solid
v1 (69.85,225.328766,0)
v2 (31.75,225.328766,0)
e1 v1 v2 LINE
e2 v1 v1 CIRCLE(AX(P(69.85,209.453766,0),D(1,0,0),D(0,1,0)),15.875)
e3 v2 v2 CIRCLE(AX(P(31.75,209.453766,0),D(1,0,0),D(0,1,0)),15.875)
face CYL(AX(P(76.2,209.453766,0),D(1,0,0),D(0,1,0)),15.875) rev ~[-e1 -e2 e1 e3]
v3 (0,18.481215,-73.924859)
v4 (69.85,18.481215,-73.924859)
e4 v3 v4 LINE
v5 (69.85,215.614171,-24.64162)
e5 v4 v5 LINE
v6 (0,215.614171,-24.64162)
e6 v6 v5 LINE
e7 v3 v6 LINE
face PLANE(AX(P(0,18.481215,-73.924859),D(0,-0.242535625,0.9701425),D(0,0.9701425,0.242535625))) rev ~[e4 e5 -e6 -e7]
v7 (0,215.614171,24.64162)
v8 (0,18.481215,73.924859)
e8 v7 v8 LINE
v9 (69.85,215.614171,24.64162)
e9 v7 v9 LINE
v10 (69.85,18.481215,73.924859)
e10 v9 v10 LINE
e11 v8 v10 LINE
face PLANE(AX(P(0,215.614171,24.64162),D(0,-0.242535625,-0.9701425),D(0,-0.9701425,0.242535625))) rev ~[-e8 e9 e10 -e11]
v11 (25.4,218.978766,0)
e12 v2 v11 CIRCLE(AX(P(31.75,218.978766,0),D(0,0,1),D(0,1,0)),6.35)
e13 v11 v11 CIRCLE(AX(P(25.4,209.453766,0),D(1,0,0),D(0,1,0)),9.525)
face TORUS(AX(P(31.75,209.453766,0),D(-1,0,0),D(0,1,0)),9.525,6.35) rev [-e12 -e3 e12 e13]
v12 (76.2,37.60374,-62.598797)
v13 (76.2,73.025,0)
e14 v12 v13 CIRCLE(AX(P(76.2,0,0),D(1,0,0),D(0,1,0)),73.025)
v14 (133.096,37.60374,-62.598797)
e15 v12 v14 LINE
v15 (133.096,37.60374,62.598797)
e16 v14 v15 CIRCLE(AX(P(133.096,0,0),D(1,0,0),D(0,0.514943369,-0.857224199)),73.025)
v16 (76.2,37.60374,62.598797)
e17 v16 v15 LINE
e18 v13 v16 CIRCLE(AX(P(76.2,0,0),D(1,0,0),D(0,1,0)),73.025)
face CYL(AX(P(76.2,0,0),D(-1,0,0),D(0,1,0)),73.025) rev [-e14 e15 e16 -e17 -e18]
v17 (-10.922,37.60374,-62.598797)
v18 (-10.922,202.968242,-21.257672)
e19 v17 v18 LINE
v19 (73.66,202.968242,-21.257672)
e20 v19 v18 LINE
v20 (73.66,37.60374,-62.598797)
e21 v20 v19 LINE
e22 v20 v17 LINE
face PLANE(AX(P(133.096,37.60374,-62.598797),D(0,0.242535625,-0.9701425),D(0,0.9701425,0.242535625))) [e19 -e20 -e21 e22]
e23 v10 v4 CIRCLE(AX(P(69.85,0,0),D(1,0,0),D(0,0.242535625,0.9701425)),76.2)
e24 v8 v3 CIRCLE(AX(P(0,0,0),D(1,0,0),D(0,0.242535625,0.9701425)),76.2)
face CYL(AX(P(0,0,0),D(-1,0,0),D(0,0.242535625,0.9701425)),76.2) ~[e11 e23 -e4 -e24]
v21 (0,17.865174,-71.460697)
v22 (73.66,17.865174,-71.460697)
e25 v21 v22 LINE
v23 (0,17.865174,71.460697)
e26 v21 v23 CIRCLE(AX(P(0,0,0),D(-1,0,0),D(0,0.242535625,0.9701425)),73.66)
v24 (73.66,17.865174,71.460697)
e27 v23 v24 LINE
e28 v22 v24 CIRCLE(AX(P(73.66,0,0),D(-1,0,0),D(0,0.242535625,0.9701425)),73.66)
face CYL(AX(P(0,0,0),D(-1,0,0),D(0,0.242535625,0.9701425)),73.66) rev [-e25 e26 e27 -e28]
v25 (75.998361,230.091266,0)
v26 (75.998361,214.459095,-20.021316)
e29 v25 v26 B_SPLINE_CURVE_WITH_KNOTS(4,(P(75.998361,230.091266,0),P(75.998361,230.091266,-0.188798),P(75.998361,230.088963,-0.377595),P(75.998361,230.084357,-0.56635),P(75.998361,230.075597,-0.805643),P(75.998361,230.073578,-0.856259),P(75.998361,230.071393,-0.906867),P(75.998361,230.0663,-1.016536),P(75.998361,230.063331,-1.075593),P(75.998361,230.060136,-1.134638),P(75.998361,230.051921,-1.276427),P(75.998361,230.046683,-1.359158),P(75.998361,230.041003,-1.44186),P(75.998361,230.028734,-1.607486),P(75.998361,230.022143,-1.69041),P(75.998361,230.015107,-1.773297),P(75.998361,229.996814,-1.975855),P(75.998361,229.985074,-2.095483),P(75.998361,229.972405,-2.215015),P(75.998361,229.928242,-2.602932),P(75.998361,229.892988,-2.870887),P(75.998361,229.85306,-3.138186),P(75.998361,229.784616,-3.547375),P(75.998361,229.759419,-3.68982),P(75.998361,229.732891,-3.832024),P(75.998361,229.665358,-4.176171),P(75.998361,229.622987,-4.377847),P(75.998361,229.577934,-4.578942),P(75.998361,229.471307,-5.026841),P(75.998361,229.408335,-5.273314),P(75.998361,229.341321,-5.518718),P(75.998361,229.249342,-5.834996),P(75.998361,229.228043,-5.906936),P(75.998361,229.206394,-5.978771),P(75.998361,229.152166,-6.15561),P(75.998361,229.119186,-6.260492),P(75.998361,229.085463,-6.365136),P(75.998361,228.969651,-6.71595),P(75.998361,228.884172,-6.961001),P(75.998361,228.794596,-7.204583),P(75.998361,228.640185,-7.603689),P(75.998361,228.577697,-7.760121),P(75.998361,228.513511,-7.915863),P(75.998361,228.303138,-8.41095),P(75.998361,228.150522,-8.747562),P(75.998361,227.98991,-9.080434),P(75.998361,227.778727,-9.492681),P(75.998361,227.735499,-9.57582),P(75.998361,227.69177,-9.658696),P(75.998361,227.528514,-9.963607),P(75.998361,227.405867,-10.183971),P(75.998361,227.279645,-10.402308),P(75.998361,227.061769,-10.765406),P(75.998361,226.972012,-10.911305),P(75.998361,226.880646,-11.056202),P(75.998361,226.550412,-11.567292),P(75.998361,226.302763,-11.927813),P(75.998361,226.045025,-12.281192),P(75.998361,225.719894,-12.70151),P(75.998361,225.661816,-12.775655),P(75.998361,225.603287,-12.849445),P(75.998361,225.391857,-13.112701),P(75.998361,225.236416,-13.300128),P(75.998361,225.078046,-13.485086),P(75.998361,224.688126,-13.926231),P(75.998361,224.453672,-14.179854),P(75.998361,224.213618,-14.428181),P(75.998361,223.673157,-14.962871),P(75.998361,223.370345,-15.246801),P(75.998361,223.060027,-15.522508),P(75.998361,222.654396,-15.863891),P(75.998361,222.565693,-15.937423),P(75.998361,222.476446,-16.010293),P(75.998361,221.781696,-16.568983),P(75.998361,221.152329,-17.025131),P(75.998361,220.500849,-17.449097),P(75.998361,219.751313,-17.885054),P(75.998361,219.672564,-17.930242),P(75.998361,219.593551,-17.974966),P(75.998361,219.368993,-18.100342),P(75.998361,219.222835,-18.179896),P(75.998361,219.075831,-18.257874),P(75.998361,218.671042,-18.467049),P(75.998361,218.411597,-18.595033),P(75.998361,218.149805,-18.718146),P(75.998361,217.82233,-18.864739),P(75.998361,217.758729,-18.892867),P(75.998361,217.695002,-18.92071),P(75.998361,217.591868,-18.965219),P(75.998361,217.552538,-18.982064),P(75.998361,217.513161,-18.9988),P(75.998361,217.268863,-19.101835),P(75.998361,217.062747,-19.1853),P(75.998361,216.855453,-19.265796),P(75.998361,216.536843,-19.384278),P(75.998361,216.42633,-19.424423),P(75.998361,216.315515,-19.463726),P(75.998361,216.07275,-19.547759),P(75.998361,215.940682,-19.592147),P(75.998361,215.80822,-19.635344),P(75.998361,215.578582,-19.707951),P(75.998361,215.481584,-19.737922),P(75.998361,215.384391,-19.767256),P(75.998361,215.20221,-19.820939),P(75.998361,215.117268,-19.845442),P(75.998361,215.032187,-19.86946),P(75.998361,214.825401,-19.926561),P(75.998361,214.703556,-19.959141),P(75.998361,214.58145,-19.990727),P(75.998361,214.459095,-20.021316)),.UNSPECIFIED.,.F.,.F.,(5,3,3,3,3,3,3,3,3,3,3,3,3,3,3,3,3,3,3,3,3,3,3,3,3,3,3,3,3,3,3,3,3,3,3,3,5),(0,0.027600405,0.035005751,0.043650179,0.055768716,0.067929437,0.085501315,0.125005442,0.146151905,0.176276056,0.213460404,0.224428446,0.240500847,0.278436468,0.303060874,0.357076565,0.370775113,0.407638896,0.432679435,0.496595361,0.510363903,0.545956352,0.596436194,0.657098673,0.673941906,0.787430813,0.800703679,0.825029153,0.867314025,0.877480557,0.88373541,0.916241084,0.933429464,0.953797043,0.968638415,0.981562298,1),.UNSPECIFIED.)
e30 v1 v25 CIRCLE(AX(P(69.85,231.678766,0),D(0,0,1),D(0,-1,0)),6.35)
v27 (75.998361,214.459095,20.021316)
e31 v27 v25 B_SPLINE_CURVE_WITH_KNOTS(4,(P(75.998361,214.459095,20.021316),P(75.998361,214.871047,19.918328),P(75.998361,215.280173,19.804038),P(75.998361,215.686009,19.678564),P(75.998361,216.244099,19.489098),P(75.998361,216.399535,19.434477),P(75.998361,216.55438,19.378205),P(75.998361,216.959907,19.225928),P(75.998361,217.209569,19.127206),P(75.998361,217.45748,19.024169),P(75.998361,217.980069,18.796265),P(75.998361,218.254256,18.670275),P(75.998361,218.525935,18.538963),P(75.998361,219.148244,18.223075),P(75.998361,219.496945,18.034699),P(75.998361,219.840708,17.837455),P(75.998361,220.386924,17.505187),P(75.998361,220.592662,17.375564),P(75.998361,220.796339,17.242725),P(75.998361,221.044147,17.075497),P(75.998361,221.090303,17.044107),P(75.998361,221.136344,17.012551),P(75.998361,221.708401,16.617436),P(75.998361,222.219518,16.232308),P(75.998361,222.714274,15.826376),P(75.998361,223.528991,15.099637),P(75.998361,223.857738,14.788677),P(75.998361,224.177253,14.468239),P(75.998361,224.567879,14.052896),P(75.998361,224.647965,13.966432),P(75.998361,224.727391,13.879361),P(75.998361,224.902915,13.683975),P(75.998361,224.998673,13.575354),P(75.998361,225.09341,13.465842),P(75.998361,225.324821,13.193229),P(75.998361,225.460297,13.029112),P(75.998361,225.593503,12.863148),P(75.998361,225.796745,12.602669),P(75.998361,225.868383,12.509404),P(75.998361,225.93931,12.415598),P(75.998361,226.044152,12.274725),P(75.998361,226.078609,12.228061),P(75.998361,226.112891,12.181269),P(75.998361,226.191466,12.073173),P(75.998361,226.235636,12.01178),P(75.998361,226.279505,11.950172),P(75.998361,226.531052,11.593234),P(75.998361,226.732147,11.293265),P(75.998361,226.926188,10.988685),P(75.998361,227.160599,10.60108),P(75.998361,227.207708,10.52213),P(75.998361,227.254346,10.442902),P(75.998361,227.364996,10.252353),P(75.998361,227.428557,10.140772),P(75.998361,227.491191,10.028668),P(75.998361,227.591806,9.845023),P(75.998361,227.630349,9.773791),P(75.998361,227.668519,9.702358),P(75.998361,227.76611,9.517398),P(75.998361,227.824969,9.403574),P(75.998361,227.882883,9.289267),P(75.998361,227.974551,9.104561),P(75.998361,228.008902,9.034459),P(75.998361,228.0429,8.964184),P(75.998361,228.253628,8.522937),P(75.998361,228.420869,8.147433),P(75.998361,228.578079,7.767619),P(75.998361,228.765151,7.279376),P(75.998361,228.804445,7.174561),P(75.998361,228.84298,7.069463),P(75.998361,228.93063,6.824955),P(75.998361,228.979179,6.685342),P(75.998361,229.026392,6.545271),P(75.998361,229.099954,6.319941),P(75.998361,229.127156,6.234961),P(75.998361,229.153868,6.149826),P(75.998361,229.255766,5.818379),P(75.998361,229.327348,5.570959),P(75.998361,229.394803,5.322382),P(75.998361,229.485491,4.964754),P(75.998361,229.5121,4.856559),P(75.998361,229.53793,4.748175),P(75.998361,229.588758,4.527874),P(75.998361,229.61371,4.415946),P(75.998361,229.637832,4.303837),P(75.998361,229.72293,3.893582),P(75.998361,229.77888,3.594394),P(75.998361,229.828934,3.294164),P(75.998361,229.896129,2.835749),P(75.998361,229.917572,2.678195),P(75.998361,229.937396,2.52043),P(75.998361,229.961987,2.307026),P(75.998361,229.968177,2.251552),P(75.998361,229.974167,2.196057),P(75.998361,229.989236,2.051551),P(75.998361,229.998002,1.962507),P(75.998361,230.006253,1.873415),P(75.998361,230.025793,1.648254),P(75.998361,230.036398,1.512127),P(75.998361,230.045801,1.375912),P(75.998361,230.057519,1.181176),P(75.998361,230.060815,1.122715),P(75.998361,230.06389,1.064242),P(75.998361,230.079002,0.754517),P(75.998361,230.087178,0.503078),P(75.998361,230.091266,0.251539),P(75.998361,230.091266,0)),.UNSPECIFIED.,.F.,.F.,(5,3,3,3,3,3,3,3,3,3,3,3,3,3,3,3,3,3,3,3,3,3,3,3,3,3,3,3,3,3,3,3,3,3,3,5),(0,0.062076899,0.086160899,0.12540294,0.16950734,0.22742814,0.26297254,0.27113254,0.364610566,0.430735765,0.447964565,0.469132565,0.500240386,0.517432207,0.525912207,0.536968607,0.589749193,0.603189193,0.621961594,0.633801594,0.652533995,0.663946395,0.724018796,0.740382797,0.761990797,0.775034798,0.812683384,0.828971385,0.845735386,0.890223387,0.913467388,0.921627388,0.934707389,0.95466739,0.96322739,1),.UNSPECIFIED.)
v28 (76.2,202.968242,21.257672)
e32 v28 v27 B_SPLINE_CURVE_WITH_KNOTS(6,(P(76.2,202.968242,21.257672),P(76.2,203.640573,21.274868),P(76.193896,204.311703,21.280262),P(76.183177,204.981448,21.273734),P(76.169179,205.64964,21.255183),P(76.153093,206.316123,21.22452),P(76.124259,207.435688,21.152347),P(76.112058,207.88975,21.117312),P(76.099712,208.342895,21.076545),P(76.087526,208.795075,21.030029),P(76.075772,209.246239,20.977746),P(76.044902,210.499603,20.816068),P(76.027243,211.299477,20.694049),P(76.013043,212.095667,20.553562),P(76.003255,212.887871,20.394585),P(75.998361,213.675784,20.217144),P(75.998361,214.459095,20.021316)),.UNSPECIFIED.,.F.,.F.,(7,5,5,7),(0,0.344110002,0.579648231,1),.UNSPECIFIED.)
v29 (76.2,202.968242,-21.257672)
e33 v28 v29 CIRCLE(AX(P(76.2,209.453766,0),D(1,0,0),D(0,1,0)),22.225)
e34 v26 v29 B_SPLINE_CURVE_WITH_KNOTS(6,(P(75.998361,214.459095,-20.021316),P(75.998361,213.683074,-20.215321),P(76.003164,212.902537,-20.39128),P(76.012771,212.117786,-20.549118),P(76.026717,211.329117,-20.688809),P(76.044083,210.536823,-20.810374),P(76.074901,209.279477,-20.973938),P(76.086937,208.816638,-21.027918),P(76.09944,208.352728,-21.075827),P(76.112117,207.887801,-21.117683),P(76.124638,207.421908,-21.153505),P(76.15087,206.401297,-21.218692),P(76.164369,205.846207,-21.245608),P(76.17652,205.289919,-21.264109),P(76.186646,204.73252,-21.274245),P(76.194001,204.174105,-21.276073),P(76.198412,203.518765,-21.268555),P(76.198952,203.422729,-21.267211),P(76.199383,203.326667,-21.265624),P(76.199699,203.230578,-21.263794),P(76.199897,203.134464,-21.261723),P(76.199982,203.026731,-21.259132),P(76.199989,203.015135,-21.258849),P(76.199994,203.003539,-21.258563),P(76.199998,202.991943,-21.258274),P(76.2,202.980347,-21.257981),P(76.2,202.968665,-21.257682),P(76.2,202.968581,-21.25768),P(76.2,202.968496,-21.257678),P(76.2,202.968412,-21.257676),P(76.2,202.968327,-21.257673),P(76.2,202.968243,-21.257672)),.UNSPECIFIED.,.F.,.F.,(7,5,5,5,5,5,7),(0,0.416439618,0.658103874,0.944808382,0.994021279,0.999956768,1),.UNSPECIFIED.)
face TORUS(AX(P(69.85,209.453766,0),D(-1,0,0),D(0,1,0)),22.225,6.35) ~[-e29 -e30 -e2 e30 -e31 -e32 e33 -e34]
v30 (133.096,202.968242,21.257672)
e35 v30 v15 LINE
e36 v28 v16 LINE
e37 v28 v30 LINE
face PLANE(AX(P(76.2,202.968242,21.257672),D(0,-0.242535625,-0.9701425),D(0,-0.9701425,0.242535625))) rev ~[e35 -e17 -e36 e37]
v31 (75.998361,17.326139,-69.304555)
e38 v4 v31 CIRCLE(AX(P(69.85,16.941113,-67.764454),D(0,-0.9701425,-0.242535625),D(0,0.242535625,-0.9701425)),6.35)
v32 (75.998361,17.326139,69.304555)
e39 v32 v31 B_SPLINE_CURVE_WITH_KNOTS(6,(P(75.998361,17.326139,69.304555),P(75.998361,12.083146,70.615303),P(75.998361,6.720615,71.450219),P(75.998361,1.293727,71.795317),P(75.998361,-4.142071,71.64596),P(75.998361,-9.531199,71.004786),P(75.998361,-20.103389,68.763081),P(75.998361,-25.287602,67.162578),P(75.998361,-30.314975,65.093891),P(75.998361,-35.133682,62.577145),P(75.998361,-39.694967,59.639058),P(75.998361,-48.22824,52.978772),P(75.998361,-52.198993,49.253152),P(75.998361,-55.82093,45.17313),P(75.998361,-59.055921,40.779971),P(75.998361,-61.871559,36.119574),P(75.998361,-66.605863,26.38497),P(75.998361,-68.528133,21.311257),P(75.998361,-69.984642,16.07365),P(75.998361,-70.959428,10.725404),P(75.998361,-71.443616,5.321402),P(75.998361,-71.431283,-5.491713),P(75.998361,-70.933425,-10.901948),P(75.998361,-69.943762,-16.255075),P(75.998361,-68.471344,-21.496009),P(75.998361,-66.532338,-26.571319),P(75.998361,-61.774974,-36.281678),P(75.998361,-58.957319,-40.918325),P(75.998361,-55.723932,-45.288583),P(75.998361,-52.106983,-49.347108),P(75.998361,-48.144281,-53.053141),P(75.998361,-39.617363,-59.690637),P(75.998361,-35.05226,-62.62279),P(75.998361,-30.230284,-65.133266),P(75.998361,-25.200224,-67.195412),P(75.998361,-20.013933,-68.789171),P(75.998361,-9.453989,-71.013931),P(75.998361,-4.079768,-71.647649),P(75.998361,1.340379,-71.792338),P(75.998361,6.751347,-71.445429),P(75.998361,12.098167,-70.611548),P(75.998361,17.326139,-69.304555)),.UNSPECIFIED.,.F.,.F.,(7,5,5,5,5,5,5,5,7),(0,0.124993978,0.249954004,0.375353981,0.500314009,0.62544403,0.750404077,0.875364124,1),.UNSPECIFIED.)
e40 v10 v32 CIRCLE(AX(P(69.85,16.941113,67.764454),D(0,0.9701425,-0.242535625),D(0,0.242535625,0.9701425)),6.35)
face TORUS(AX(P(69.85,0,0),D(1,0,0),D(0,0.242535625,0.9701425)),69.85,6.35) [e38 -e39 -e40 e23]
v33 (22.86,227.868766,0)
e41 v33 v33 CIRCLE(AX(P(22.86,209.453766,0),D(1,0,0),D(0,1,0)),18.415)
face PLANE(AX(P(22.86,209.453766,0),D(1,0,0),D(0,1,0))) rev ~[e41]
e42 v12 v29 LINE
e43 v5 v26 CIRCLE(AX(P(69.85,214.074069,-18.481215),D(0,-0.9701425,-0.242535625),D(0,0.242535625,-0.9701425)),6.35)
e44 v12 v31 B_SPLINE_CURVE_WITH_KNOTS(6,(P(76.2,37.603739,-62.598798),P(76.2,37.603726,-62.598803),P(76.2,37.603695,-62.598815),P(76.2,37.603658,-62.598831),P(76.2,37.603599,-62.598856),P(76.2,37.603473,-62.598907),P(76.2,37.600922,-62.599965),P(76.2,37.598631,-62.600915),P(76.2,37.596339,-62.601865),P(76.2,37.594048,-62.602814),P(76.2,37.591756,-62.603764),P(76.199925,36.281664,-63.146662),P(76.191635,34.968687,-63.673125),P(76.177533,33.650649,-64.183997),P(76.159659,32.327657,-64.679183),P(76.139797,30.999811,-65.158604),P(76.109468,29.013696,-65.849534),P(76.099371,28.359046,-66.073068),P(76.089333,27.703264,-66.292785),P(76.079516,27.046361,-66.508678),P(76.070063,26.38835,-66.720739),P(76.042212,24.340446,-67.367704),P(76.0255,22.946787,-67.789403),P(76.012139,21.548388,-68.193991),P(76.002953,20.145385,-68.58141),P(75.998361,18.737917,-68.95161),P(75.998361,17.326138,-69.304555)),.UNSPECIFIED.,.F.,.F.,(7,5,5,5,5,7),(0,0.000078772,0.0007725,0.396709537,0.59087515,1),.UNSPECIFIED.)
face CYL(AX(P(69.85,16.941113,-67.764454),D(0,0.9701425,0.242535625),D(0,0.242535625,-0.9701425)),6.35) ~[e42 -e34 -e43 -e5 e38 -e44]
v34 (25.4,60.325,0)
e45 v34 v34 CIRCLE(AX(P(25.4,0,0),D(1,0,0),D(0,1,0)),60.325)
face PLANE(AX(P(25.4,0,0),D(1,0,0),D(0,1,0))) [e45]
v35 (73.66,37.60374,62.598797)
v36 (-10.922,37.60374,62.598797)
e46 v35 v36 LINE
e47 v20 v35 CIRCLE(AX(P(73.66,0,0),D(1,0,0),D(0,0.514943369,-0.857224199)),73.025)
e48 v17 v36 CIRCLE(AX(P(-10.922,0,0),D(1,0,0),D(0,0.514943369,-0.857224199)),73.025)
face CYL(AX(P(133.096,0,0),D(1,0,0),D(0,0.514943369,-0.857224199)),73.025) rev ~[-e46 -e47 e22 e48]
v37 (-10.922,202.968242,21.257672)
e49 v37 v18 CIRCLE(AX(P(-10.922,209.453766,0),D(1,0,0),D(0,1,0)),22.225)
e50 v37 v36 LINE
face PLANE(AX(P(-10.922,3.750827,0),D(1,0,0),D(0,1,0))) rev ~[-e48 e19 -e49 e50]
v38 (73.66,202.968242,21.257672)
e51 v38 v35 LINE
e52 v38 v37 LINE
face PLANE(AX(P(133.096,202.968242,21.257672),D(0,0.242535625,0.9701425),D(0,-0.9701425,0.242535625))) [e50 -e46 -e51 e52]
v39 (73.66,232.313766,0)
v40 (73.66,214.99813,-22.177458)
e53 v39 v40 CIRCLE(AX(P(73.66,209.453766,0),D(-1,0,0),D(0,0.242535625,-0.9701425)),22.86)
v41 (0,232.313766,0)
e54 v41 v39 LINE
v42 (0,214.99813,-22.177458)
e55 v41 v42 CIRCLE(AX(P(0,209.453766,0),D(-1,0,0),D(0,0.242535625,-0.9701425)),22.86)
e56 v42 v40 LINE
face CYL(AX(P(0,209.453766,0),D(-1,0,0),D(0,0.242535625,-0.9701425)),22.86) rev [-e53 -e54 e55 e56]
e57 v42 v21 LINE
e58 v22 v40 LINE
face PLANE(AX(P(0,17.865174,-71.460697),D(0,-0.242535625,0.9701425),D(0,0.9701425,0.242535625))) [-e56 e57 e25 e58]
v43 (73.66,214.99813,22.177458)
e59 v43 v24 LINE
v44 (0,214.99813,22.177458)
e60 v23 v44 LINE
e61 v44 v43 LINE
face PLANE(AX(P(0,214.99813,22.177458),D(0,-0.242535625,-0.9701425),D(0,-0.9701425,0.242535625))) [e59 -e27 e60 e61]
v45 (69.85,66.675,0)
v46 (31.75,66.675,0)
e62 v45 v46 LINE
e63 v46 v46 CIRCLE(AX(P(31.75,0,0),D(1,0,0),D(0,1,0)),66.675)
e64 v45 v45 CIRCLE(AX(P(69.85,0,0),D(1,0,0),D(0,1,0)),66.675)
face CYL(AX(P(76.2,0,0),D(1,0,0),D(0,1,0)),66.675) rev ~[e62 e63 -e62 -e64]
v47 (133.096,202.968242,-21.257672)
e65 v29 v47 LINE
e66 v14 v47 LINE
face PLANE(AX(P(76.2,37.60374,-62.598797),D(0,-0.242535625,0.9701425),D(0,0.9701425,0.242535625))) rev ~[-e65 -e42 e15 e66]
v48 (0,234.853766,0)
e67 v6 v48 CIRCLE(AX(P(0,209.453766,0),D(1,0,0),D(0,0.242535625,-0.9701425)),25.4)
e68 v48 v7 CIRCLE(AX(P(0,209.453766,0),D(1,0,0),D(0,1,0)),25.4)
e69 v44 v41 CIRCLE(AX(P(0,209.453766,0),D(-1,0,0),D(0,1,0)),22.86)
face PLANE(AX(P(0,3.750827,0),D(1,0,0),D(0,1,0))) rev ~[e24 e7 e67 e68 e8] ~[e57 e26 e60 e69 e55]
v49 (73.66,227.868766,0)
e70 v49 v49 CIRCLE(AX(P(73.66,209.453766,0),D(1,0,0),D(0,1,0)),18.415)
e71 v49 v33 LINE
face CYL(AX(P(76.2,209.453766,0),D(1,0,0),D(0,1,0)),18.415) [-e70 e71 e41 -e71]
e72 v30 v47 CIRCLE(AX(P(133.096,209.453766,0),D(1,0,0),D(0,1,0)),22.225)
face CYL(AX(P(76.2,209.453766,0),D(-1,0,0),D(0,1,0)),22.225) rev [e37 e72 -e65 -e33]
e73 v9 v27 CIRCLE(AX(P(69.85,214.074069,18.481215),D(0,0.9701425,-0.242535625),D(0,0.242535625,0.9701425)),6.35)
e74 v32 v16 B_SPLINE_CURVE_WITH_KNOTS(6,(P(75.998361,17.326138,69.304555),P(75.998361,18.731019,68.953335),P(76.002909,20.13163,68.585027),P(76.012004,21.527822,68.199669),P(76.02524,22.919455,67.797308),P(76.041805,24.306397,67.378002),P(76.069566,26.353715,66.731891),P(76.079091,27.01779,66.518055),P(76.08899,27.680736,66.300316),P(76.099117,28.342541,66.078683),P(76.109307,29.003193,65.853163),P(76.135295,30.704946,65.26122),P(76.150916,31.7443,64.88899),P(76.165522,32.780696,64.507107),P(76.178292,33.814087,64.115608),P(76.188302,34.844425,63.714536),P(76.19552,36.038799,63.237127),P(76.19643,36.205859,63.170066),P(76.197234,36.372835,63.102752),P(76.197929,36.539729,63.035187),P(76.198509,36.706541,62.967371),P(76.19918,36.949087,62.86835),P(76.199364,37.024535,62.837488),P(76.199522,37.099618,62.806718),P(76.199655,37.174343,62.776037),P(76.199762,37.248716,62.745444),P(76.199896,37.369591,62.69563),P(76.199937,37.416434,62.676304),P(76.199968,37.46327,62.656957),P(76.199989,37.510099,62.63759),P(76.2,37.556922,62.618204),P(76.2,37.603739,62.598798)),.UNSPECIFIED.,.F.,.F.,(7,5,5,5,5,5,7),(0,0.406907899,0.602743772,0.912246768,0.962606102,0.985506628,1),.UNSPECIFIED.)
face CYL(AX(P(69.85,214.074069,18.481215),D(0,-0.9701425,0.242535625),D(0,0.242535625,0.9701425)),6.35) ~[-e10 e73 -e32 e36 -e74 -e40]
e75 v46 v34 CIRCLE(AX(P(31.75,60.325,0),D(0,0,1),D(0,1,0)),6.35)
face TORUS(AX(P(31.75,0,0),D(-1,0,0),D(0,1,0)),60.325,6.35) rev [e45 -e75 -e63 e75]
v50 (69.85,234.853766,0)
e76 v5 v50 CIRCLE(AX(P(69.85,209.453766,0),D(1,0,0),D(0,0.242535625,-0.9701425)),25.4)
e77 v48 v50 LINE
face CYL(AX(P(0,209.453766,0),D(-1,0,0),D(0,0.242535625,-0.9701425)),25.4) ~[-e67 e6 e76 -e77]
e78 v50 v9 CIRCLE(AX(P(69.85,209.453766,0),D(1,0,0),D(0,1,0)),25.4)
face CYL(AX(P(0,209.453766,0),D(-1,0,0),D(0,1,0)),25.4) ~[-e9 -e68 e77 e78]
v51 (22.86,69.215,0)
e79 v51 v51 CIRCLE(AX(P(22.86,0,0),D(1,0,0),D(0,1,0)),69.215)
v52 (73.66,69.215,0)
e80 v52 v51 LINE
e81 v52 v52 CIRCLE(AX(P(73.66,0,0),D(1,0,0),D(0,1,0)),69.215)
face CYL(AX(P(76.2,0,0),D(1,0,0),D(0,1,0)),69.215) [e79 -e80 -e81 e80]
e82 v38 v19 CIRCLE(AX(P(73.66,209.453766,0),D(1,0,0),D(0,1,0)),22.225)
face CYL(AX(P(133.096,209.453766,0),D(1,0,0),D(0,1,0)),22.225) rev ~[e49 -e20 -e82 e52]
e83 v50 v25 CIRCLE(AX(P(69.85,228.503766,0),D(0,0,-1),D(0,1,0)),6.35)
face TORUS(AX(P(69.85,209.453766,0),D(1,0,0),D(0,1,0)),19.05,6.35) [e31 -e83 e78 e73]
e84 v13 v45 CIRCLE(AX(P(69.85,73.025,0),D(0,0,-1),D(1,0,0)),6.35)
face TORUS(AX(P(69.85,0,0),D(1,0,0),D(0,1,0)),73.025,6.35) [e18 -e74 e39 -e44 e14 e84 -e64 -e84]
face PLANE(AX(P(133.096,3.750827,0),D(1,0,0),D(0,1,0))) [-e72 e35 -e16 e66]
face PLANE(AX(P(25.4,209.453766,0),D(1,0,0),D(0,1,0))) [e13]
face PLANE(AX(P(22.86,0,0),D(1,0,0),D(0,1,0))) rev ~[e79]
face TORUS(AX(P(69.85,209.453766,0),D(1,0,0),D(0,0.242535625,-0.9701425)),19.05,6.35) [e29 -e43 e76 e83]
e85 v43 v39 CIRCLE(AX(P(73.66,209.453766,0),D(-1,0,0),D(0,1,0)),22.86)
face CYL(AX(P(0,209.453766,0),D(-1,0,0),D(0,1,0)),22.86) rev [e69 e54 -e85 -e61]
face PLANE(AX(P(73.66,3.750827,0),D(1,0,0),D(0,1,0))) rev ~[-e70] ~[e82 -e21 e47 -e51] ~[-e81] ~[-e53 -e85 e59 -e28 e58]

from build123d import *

# Parameters (mm, degrees)
F1_DEPTH = 76.2
F2_R     = 66.675
F2_R_2   = 15.875
F3_DEPTH = 50.8
F4_T     = -2.54
F5_F1_R  = 6.35
F5_F2_R  = 6.35
F5_F3_R  = 6.35
F6_DEPTH = 56.896
F7_DEPTH = 144.018


# Not quite as in the source:
# - a fillet or chamfer that OpenCascade refuses, or shapes differently, is made with other operations: its cross-section is extruded or revolved along the edge and cut away or added


with BuildPart() as f1:
    # F0 (on Right) → F1 (new body)
    with BuildSketch(Plane.YZ):
        with BuildLine():
            ThreePointArc((18.4812146278, -73.9248585111), (60.0612543768, -46.8944103565), (76.2, 0))
            ThreePointArc((76.2, 0), (60.0612543768, 46.8944103565), (18.4812146278, 73.9248585111))
            ThreePointArc((18.4812146278, 73.9248585111), (-76.2, 0), (18.4812146278, -73.9248585111))
        make_face()
        with BuildLine():
            ThreePointArc((18.4812146278, 73.9248585111), (60.0612543768, 46.8944103565), (76.2, 0))
            ThreePointArc((76.2, 0), (60.0612543768, -46.8944103565), (18.4812146278, -73.9248585111))
            Line((18.4812146278, -73.9248585111), (215.6141706573, -24.6416195037))
            ThreePointArc((215.6141706573, -24.6416195037), (184.0537657814, 0), (215.6141706573, 24.6416195037))
            Line((215.6141706573, 24.6416195037), (18.4812146278, 73.9248585111))
        make_face()
        with BuildLine():
            ThreePointArc((234.8537657814, 0), (229.474183907, 15.6314701188), (215.6141706573, 24.6416195037))
            ThreePointArc((215.6141706573, 24.6416195037), (184.0537657814, 0), (215.6141706573, -24.6416195037))
            ThreePointArc((215.6141706573, -24.6416195037), (229.474183907, -15.6314701188), (234.8537657814, 0))
        make_face()
    extrude(amount=F1_DEPTH)

    # F2 (on face) → F3 (cut)
    with BuildSketch(Plane.YZ.offset(76.2)):
        Circle(F2_R)
        with Locations((209.4537657814, 0)):
            Circle(F2_R_2)
    extrude(amount=-F3_DEPTH, mode=Mode.SUBTRACT)

    # F4
    f4_openings = [f1.faces().sort_by_distance(p)[0] for p in [
        (0, 57.51924, 0),
    ]]
    offset(amount=F4_T, openings=f4_openings, kind=Kind.INTERSECTION)

    # F5: fillet of radius 6.35 on 8 edges, made by hand

    # F5_f1
    f5_f1_edges = [f1.edges().sort_by_distance(p)[0] for p in [
        (76.2, -76.2, 0),
        (76.2, 117.0476926425, 49.2832390074),
        (76.2, 117.0476926425, -49.2832390074),
        (76.2, 234.8537657814, 0),
    ]]
    fillet(f5_f1_edges, radius=F5_F1_R)

    # F5_f2
    f5_f2_edges = [f1.edges().sort_by_distance(p)[0] for p in [
        (25.4, -66.675, 0),
    ]]
    fillet(f5_f2_edges, radius=F5_F2_R)

    # F5_f3
    f5_f3_edges = [f1.edges().sort_by_distance(p)[0] for p in [
        (25.4, 193.5787657814, 0),
    ]]
    fillet(f5_f3_edges, radius=F5_F3_R)

    # F5_s4 → F5_t5 (revolve, cut)
    with BuildSketch(Plane.XY):
        with BuildLine():
            ThreePointArc((76.2, 73.025), (74.3401280605, 68.5348719395), (69.85, 66.675))
            Line((69.85, 66.675), (69.85, 66.548))
            Line((69.85, 66.548), (76.327, 66.548))
            Line((76.327, 66.548), (76.327, 73.025))
            Line((76.327, 73.025), (76.2, 73.025))
        make_face()
    revolve(axis=Axis((76.2, 0, 0), (1, 0, 0)), mode=Mode.SUBTRACT)

    # F5_s6 → F5_t7 (revolve, cut)
    with BuildSketch(Plane.XY):
        with BuildLine():
            ThreePointArc((69.85, 225.3287657814), (74.3401280605, 227.1886377208), (76.2, 231.6787657814))
            Line((76.2, 231.6787657814), (76.327, 231.6787657814))
            Line((76.327, 231.6787657814), (76.327, 225.2017657814))
            Line((76.327, 225.2017657814), (69.85, 225.2017657814))
            Line((69.85, 225.2017657814), (69.85, 225.3287657814))
        make_face()
    revolve(axis=Axis((76.2, 209.4537657814, 0), (1, 0, 0)), mode=Mode.SUBTRACT)

    # F6 (add): a face of the model
    f6_faces = [f1.faces().sort_by_distance(p)[0] for p in [
        (76.2, 119.1189366743, 0),
    ]]
    extrude(f6_faces, amount=F6_DEPTH)

    # F7 (add): a face of the model
    f7_faces = [f1.faces().sort_by_distance(p)[0] for p in [
        (133.096, 119.1189366743, 0),
    ]]
    extrude(f7_faces, amount=-F7_DEPTH)


solid = f1.part
